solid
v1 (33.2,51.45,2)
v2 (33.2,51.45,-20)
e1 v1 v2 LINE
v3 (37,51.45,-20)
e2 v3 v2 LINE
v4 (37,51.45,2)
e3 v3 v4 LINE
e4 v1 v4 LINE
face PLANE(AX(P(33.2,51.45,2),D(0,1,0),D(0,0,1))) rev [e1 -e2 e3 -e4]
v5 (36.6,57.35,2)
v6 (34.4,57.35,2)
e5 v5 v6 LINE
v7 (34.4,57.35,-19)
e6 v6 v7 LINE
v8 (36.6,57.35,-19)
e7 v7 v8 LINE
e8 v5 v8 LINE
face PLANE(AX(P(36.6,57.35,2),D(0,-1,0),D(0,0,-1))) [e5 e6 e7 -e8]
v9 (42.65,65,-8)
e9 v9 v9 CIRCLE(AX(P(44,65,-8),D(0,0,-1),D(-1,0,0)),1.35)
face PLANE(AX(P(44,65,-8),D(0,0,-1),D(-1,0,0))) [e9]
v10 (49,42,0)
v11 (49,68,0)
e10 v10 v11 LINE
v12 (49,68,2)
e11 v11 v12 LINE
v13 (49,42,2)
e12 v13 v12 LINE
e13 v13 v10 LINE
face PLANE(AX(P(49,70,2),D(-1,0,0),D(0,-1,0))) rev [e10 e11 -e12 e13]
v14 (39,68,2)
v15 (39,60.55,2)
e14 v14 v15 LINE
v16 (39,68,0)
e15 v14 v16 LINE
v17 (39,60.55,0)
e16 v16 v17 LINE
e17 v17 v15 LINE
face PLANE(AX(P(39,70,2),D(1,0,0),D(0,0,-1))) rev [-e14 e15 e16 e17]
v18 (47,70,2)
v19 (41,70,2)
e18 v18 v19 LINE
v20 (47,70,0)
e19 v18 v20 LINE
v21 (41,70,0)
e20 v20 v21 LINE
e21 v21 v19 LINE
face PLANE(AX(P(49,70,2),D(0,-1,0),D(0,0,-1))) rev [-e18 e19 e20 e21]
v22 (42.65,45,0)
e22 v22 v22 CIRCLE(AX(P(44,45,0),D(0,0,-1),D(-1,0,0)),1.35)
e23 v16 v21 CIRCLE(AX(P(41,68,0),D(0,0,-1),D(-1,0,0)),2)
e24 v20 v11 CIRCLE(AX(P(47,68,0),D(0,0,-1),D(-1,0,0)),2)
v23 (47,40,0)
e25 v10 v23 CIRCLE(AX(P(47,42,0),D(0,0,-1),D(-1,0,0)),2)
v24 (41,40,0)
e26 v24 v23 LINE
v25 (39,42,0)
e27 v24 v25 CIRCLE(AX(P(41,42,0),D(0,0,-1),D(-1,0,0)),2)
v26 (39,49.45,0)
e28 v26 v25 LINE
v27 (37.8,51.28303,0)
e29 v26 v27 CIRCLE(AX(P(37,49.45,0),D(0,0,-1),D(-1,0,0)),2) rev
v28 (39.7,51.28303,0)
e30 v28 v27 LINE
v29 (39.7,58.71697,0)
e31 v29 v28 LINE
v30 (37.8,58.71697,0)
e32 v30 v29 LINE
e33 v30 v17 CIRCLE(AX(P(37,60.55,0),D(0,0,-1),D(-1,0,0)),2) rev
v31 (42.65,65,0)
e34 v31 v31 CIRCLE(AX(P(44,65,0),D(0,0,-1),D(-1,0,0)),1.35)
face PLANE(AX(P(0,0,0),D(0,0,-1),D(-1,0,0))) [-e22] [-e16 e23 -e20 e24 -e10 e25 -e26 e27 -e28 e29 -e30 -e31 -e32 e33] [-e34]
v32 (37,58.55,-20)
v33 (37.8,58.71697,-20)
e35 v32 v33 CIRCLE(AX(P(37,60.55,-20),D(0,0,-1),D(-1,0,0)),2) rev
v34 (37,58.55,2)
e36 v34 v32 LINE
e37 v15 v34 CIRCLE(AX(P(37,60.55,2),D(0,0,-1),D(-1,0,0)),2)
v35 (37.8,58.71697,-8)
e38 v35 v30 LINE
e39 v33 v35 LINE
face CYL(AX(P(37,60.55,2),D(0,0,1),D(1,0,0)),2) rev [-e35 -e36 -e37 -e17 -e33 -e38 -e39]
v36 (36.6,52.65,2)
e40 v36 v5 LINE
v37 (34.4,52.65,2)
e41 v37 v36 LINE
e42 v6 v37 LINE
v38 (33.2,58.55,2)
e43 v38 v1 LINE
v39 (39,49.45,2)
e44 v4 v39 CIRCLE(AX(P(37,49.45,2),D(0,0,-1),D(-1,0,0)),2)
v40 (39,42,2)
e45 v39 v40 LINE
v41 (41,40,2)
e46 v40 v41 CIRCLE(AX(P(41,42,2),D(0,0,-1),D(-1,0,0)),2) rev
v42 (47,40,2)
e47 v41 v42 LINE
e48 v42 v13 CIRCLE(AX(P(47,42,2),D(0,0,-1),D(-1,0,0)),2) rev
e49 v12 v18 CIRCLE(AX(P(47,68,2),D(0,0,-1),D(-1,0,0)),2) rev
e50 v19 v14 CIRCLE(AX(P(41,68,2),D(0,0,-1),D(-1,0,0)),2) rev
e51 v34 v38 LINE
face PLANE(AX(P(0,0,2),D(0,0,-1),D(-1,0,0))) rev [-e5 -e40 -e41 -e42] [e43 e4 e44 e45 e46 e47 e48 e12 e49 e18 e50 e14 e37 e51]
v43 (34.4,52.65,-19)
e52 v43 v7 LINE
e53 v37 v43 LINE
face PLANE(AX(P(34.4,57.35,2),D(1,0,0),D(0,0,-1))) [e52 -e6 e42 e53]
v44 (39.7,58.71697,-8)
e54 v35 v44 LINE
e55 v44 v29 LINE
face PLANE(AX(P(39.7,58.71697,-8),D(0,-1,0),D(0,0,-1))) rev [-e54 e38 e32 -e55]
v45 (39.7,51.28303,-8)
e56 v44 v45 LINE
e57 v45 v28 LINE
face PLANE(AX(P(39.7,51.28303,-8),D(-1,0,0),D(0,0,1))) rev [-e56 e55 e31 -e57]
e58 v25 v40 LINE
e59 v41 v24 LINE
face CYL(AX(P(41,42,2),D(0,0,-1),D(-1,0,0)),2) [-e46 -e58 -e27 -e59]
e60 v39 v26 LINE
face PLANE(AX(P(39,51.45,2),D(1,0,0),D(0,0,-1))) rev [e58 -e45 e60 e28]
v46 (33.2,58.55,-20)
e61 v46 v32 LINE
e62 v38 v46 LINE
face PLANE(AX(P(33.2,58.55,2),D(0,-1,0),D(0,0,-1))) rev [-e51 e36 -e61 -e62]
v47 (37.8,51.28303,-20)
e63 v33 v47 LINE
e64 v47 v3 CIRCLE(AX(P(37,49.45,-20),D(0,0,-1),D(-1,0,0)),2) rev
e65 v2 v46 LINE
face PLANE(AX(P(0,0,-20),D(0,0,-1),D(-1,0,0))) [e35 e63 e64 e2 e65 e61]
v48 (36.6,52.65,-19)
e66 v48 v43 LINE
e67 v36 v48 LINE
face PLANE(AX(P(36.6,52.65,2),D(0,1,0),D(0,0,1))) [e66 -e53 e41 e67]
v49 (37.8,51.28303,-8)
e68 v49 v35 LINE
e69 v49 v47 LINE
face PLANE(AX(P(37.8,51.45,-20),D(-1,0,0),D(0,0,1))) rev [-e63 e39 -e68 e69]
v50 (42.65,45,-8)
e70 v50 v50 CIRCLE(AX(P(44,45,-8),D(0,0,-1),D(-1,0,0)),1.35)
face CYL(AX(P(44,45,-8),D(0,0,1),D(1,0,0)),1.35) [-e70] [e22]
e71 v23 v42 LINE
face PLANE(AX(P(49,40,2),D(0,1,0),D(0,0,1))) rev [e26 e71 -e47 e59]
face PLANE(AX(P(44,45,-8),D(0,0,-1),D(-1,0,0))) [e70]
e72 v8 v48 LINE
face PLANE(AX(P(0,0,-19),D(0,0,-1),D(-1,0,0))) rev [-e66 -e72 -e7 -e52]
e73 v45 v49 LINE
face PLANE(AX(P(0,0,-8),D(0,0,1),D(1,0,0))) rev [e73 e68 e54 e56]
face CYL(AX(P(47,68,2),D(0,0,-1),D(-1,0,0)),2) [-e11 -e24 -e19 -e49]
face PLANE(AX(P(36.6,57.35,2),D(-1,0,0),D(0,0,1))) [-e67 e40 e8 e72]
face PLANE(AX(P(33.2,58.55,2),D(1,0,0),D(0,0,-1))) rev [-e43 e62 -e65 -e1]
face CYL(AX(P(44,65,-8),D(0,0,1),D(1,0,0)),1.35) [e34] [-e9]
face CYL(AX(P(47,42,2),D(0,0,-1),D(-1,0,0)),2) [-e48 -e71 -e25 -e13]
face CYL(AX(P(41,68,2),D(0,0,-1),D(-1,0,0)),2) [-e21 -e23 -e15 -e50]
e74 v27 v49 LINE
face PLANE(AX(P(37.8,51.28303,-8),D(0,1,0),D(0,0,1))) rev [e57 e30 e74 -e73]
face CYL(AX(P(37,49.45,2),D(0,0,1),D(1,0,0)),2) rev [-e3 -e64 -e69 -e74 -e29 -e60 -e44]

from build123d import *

# Parameters (mm, degrees)
SKETCH1_W           = 2.2
SKETCH1_H           = 4.7
BOSS_EXTRUDE1_DEPTH = 2
SKETCH2_W           = 4.6
SKETCH2_H           = 7.1
SKETCH2_W_2         = 2.2
SKETCH2_H_2         = 4.7
BOSS_EXTRUDE2_DEPTH = 20
SKETCH3_W           = 2.2
SKETCH3_H           = 4.7
BOSS_EXTRUDE3_DEPTH = 1
SKETCH5_R           = 1.35
BOSS_EXTRUDE4_DEPTH = 8
FILLET1_R           = 2
SKETCH6_W           = 1.9
SKETCH6_H           = 7.433939444
BOSS_EXTRUDE5_DEPTH = 8


with BuildPart() as part:
    # Sketch1 → Boss-Extrude1 (new body)
    with BuildSketch(Plane.XY):
        Polygon((49, 70), (39, 70), (39, 58.55), (33.2, 58.55), (33.2, 51.45), (39, 51.45), (39, 40), (49, 40), align=None)
        with Locations((35.5, 55)):
            Rectangle(SKETCH1_W, SKETCH1_H, mode=Mode.SUBTRACT)
    extrude(amount=BOSS_EXTRUDE1_DEPTH)

    # Sketch2 → Boss-Extrude2 (add)
    with BuildSketch(Plane(origin=(0, 0, 0), x_dir=(-1, 0, 0), z_dir=(0, 0, -1))):
        with Locations((-35.5, 55)):
            Rectangle(SKETCH2_W, SKETCH2_H)
        with Locations((-35.5, 55)):
            Rectangle(SKETCH2_W_2, SKETCH2_H_2, mode=Mode.SUBTRACT)
    extrude(amount=BOSS_EXTRUDE2_DEPTH)

    # Sketch3 → Boss-Extrude3 (add)
    with BuildSketch(Plane(origin=(0, 0, -20), x_dir=(-1, 0, 0), z_dir=(0, 0, -1))):
        with Locations((-35.5, 55)):
            Rectangle(SKETCH3_W, SKETCH3_H)
    extrude(amount=-BOSS_EXTRUDE3_DEPTH)

    # Sketch5 → Boss-Extrude4 (add)
    with BuildSketch(Plane(origin=(0, 0, 0), x_dir=(-1, 0, 0), z_dir=(0, 0, -1))):
        with Locations((-44, 45)):
            Circle(SKETCH5_R)
        with Locations((-44, 65)):
            Circle(SKETCH5_R)
    extrude(amount=BOSS_EXTRUDE4_DEPTH)

    # Fillet1
    fillet1_edges = [part.edges().sort_by_distance(p)[0] for p in [
        (49, 70, 1),
    ]]
    fillet(fillet1_edges, radius=FILLET1_R)
    fillet1_2_edges = [part.edges().sort_by_distance(p)[0] for p in [
        (39, 70, 1),
    ]]
    fillet(fillet1_2_edges, radius=FILLET1_R)
    fillet1_3_edges = [part.edges().sort_by_distance(p)[0] for p in [
        (49, 40, 1),
    ]]
    fillet(fillet1_3_edges, radius=FILLET1_R)
    fillet1_4_edges = [part.edges().sort_by_distance(p)[0] for p in [
        (39, 58.55, 1),
    ]]
    fillet(fillet1_4_edges, radius=FILLET1_R)
    fillet1_5_edges = [part.edges().sort_by_distance(p)[0] for p in [
        (39, 40, 1),
    ]]
    fillet(fillet1_5_edges, radius=FILLET1_R)
    fillet1_6_edges = [part.edges().sort_by_distance(p)[0] for p in [
        (39, 51.45, 1),
    ]]
    fillet(fillet1_6_edges, radius=FILLET1_R)

    # Sketch6 → Boss-Extrude5 (add)
    with BuildSketch(Plane(origin=(0, 0, 0), x_dir=(-1, 0, 0), z_dir=(0, 0, -1))):
        with Locations((-38.75, 55)):
            Rectangle(SKETCH6_W, SKETCH6_H)
    extrude(amount=BOSS_EXTRUDE5_DEPTH)


solid = part.part
